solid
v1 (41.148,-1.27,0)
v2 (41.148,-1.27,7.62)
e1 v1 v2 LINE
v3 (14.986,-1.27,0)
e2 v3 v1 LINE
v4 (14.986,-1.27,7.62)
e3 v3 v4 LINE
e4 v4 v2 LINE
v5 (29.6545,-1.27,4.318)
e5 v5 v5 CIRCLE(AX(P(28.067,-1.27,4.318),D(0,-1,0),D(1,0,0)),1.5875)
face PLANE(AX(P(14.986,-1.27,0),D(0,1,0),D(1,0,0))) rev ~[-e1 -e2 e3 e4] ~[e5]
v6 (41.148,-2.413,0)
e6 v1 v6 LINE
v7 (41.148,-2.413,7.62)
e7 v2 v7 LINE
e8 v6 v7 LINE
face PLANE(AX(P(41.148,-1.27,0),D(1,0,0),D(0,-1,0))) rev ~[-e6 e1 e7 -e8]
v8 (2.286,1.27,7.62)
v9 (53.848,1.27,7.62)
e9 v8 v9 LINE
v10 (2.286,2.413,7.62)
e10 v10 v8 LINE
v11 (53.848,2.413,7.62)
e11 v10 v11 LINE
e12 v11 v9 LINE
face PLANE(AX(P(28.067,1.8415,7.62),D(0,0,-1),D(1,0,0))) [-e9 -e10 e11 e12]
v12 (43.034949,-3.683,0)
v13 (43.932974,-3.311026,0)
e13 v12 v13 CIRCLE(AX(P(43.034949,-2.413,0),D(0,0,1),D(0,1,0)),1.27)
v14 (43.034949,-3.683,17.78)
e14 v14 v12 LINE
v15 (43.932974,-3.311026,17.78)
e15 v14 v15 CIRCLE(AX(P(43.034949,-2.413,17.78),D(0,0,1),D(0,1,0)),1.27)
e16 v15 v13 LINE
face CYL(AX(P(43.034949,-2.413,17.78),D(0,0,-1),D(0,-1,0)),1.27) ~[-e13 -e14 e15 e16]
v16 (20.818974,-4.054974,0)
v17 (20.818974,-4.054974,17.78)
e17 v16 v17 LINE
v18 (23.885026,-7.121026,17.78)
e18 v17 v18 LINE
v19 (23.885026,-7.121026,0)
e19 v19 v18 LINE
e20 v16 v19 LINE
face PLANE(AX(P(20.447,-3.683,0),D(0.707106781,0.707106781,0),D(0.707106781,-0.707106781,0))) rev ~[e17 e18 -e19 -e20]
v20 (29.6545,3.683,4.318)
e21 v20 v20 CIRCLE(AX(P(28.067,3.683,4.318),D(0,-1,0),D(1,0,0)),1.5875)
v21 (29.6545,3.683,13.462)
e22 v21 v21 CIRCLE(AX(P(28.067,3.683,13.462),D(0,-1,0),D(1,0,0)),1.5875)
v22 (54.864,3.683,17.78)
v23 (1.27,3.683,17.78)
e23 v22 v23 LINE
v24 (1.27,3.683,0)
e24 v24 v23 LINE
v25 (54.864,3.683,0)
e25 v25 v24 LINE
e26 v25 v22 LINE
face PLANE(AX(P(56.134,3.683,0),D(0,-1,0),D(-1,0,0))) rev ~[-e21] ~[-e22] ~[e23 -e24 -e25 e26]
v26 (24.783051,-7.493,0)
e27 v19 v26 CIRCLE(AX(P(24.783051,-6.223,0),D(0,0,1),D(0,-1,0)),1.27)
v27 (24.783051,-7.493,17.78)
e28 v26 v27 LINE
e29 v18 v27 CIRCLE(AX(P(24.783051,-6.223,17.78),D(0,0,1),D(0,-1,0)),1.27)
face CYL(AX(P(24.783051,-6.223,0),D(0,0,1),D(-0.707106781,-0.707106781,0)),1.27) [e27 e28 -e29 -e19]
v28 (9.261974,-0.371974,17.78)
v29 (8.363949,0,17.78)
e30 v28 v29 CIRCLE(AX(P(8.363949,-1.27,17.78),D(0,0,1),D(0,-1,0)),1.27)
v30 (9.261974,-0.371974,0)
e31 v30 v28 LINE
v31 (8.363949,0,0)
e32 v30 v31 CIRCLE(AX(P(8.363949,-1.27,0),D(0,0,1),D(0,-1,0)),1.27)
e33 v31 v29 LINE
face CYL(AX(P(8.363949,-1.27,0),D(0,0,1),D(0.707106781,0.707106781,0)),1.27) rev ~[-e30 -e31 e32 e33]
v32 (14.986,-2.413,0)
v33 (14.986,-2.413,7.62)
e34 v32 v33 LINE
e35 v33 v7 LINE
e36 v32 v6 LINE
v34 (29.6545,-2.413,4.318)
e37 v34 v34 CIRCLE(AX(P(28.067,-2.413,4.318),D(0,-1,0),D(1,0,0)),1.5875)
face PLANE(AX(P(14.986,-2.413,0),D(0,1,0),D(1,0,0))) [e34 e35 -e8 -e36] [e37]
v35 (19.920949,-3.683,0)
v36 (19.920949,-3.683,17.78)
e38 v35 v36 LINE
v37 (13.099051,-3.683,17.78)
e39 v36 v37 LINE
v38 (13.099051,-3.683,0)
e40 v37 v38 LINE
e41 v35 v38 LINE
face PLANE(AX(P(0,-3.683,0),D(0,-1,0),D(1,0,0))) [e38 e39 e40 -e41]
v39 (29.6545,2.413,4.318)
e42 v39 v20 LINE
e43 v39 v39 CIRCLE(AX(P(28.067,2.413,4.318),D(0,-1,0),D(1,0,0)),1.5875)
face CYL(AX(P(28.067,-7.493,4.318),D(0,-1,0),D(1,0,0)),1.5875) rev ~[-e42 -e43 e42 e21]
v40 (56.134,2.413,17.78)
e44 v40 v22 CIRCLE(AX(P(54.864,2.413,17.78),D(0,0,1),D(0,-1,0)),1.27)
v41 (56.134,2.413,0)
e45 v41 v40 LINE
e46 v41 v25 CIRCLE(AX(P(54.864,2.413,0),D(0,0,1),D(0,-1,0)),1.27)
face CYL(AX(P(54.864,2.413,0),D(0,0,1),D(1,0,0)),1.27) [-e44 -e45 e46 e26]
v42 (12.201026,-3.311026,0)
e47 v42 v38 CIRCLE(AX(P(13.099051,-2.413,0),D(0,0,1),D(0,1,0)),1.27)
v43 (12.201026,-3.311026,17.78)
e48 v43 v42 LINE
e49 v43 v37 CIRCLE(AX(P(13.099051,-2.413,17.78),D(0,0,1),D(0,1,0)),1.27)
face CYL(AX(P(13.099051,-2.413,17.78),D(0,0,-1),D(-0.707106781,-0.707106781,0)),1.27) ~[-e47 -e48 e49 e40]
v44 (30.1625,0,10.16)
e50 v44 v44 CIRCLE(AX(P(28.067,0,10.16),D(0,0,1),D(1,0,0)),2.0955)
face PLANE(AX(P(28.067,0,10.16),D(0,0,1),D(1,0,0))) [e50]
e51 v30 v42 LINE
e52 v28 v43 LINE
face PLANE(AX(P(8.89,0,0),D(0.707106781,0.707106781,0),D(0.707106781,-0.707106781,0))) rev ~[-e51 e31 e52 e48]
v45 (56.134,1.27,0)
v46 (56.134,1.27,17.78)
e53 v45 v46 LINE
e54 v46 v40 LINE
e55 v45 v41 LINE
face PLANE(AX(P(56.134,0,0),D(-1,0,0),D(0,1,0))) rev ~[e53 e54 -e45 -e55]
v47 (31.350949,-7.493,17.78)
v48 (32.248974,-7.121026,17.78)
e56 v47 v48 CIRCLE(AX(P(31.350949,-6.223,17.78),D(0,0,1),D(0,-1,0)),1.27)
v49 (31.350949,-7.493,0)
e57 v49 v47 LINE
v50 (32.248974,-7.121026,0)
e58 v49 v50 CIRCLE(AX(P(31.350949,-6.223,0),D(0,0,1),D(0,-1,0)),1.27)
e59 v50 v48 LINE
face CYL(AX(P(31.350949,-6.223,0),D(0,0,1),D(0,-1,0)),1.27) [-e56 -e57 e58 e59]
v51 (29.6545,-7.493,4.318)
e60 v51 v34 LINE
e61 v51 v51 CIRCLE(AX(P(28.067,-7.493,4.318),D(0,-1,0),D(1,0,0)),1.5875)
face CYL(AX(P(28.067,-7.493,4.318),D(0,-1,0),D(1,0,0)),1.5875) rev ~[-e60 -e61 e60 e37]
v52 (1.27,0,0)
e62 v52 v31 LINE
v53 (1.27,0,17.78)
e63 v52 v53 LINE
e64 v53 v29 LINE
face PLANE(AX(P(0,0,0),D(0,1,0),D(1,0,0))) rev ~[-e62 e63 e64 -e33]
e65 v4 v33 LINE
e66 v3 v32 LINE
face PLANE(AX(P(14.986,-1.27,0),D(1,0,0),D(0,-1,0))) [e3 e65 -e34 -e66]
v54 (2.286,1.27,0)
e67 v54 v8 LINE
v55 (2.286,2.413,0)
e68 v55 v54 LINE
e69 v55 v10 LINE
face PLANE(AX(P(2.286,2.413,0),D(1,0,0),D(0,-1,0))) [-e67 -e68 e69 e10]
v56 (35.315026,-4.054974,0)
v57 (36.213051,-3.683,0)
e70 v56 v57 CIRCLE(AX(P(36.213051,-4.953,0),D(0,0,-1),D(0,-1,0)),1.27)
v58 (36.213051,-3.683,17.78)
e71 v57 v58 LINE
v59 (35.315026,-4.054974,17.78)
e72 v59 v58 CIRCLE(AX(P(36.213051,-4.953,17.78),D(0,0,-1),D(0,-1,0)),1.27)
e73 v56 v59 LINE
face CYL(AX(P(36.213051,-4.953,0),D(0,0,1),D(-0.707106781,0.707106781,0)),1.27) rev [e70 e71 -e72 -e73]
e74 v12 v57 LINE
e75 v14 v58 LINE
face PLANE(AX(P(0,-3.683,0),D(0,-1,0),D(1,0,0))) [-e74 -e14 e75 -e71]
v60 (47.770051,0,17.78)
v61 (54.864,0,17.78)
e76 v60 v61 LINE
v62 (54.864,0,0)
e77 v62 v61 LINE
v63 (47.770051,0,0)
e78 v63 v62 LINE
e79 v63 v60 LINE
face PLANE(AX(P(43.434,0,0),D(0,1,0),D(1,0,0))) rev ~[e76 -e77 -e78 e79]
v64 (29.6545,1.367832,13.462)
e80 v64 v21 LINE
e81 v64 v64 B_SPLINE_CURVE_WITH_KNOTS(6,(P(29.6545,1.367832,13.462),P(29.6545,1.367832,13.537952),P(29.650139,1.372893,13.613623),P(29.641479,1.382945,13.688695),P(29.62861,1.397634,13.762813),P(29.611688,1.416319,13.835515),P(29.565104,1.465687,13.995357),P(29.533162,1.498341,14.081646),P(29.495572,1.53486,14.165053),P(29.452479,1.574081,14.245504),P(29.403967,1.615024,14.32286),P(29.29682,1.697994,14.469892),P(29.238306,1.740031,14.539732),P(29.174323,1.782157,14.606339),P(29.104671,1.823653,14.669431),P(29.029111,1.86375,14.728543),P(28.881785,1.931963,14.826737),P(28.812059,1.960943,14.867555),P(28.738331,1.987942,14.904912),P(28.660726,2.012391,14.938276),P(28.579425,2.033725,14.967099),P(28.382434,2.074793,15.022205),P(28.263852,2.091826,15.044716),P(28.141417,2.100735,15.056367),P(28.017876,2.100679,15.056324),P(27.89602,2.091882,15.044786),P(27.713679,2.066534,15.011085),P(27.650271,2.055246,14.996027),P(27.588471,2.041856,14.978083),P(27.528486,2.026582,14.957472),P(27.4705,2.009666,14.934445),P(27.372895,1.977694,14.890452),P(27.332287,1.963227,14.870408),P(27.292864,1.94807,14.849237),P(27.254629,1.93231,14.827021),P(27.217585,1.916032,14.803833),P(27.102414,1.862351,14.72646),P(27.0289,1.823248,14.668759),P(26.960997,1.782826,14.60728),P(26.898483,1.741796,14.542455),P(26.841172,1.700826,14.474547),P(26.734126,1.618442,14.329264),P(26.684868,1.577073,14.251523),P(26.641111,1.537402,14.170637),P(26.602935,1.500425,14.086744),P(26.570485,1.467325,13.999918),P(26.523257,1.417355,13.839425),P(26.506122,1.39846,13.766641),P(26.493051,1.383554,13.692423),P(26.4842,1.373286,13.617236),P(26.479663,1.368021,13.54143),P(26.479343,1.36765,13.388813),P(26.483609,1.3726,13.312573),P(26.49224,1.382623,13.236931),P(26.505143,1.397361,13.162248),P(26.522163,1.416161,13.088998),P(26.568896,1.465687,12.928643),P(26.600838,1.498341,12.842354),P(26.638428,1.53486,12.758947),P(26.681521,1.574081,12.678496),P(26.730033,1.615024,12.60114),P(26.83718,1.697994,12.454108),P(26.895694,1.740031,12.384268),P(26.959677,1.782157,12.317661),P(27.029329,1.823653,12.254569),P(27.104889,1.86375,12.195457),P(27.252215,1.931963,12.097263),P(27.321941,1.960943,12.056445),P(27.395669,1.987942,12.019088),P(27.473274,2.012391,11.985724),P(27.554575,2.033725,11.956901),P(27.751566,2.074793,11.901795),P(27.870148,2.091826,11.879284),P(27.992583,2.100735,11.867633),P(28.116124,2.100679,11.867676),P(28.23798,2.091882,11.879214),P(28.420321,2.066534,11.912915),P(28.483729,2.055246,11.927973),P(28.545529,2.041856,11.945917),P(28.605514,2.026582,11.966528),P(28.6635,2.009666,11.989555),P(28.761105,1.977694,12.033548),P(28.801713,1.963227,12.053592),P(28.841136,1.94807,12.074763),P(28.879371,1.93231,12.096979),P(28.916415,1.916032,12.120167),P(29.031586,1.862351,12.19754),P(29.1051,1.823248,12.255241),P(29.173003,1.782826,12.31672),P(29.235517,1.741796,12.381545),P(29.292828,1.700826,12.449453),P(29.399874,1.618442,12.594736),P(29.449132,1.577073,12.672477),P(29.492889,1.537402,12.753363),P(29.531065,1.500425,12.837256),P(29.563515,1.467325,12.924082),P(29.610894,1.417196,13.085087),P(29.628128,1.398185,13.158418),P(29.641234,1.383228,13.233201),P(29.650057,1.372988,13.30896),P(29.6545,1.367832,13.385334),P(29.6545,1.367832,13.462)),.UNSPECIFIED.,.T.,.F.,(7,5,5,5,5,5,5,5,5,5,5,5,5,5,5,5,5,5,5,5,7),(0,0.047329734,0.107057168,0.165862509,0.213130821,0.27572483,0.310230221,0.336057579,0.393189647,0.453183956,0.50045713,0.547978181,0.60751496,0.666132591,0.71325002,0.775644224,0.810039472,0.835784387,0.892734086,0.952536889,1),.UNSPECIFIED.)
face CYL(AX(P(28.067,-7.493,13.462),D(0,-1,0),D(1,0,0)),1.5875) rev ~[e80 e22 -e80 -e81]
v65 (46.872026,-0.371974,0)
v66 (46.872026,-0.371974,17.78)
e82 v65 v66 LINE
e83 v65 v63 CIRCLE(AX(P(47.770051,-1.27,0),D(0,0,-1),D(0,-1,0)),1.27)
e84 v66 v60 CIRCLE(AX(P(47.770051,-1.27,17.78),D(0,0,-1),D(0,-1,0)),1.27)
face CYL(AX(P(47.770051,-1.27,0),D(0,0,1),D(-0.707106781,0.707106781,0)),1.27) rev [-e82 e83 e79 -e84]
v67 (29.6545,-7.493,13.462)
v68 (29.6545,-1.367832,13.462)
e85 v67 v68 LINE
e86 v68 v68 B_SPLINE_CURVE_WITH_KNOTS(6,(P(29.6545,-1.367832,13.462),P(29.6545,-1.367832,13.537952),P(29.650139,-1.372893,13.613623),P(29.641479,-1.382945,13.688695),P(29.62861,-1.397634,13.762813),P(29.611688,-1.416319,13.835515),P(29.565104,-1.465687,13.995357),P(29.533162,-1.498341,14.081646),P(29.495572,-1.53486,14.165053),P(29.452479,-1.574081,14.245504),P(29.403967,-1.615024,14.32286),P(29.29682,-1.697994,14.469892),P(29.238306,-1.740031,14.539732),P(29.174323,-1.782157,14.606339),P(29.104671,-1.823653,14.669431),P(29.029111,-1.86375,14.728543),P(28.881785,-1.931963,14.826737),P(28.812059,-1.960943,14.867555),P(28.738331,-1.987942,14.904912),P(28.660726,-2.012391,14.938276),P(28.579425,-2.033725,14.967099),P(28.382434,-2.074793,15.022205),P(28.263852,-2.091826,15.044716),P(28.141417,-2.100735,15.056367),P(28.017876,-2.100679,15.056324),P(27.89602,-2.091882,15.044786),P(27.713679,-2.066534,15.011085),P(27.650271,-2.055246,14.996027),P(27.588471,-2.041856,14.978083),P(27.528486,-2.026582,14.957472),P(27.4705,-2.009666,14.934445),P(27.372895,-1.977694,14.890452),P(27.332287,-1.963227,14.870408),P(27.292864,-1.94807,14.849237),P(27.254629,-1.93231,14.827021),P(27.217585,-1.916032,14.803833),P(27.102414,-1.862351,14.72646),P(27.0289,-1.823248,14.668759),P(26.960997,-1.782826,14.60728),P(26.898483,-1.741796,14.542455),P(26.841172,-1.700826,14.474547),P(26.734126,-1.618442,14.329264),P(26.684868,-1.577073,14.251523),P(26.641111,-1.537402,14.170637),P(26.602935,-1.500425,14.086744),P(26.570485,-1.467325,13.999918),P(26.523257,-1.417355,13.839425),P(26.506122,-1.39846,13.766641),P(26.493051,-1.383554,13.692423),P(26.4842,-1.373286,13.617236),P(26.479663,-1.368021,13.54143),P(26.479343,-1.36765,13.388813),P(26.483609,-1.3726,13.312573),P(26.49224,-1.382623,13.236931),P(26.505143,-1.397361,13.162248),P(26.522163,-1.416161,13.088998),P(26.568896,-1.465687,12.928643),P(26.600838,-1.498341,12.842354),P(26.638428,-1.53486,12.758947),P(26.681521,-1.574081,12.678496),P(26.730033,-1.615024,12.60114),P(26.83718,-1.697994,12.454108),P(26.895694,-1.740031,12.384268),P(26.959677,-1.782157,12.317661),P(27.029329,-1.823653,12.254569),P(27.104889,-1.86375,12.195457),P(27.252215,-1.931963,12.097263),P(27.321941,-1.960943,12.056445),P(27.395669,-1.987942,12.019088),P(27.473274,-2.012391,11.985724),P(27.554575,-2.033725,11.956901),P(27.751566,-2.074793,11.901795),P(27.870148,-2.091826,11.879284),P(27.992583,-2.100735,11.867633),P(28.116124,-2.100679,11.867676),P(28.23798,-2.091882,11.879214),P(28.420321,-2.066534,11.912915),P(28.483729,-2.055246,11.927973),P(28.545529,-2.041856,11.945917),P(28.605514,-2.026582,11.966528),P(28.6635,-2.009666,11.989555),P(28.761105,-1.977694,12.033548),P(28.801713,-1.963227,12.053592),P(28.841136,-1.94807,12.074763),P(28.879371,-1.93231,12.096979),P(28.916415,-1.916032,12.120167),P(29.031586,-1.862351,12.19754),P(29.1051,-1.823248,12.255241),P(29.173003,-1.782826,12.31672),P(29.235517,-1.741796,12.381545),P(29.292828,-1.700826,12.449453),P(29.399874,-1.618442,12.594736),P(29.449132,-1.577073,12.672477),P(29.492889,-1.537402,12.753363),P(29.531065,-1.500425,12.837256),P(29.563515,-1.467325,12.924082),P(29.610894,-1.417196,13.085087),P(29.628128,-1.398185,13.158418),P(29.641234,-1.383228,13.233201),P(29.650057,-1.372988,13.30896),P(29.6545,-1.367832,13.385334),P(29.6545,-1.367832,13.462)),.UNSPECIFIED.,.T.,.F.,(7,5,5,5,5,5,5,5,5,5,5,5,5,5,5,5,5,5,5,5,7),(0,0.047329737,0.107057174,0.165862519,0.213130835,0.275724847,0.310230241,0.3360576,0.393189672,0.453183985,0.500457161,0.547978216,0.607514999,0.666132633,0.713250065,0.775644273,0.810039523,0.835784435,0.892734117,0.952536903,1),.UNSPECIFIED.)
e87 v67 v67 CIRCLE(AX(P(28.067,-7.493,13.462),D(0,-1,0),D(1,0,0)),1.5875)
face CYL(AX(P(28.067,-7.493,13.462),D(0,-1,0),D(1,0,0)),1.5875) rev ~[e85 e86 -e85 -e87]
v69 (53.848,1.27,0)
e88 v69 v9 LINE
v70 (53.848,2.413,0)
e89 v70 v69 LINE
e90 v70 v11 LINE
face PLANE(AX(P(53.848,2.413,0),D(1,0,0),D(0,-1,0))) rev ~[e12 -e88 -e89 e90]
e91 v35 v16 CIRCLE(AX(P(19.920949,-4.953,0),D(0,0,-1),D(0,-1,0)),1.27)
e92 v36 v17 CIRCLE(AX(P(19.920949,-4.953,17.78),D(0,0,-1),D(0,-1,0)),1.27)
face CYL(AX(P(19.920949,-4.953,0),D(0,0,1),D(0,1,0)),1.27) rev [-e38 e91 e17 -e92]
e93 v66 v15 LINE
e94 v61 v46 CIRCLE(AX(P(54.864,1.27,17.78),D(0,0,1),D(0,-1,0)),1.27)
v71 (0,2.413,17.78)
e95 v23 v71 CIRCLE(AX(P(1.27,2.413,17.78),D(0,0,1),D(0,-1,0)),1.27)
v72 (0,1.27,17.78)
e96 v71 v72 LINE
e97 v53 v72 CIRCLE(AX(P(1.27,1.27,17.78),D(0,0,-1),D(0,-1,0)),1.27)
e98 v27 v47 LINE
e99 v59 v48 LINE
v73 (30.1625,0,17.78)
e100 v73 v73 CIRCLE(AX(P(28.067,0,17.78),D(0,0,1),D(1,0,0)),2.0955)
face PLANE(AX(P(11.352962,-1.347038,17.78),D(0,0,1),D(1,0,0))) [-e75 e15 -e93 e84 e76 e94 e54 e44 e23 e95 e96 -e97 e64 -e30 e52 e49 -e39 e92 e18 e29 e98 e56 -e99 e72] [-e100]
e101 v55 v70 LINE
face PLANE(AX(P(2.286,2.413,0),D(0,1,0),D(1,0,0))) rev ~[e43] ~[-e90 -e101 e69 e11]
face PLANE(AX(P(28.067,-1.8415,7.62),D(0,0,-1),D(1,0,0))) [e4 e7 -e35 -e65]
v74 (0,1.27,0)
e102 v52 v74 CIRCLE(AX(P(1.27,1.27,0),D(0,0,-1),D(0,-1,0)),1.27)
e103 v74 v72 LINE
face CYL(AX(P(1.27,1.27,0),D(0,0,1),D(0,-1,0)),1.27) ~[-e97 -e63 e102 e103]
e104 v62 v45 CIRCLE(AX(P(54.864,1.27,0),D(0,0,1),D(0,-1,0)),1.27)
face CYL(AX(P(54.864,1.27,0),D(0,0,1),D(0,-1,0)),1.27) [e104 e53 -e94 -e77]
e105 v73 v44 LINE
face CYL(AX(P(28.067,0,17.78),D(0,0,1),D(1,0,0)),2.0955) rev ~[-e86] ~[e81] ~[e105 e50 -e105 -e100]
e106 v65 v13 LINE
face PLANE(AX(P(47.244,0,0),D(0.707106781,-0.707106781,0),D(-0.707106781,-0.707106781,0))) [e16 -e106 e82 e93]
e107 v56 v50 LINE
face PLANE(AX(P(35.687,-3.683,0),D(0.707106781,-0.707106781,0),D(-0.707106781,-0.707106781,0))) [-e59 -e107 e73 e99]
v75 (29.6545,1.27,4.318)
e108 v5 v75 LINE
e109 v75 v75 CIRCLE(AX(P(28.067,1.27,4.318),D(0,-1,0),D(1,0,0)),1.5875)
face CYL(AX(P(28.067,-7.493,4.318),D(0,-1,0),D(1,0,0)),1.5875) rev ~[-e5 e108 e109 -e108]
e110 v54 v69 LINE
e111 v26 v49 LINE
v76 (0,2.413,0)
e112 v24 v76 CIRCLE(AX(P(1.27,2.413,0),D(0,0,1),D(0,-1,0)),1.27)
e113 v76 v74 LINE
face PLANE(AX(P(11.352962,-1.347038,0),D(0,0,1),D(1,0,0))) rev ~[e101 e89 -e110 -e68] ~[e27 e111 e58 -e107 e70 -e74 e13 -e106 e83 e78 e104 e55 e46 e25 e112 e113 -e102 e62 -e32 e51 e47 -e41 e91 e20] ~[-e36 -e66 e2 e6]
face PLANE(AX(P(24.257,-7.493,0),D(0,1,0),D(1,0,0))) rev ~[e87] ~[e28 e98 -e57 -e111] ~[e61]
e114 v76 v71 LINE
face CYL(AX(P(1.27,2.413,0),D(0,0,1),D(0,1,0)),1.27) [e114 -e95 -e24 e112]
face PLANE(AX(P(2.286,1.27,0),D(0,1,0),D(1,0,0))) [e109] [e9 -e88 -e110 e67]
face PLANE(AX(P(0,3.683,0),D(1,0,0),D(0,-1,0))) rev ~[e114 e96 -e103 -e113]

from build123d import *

# Parameters (mm, degrees)
F0_W         = 7.62
F0_H         = 3.81
F1_DEPTH     = 17.78
F2_W         = 51.562
F2_H         = 1.143
F2_W_2       = 26.162
F3_DEPTH     = 7.62
F4_T4_DEPTH  = 17.78
F4_T9_DEPTH  = 17.78
F4_T14_DEPTH = 17.78
F4_T19_DEPTH = 17.78
F5_R         = 1.5875
F6_DEPTH     = 25.4
F7_R         = 2.0955
F8_DEPTH     = 7.62
F9_R         = 1.27


# Not quite as in the source:
# - a fillet or chamfer that OpenCascade refuses, or shapes differently, is made with other operations: its cross-section is extruded or revolved along the edge and cut away or added


with BuildPart() as f1:
    # F0 (on Top) → F1 (new body)
    with BuildSketch(Plane.XY):
        Polygon((0, 3.683), (0, 0), (12.7, 0), (43.434, 0), (56.134, 0), (56.134, 3.683), align=None)
        Polygon((43.434, 0), (12.7, 0), (12.7, -3.683), (24.257, -3.683), (31.877, -3.683), (43.434, -3.683), align=None)
        with Locations((28.067, -5.588)):
            Rectangle(F0_W, F0_H)
    extrude(amount=F1_DEPTH)

    # F2 (on face) → F3 (cut)
    with BuildSketch(Plane(origin=(0, 0, 0), x_dir=(1, 0, 0), z_dir=(0, 0, -1))):
        with Locations((28.067, -1.8415)):
            Rectangle(F2_W, F2_H)
        with Locations((28.067, 1.8415)):
            Rectangle(F2_W_2, F2_H)
    extrude(amount=-F3_DEPTH, mode=Mode.SUBTRACT)

    # F4: chamfer of 3.81 on 4 edges, made by hand


with BuildPart() as f4_tool2:
    # F4_s3 → F4_t4 (new body)
    with BuildSketch(Plane.XY):
        Polygon((35.687, -3.683), (31.877, -7.493), (31.877, -3.683), align=None)
    extrude(amount=F4_T4_DEPTH)

    split(bisect_by=Plane.XZ.offset(7.493), keep=Keep.BOTTOM)


with BuildPart() as f1_1:
    add(f1.part)

    # F4_t1: union F4_tool2
    add(f4_tool2.part)


with BuildPart() as f4_tool7:
    # F4_s8 → F4_t9 (new body)
    with BuildSketch(Plane.XY):
        Polygon((47.244, 0), (43.434, -3.81), (43.434, 0), align=None)
    extrude(amount=F4_T9_DEPTH)

    split(bisect_by=Plane.XZ.offset(3.683), keep=Keep.BOTTOM)


with BuildPart() as f1_2:
    add(f1_1.part)

    # F4_t6: union F4_tool7
    add(f4_tool7.part)


with BuildPart() as f4_tool12:
    # F4_s13 → F4_t14 (new body)
    with BuildSketch(Plane.XY):
        Polygon((20.447, -3.683), (24.257, -7.493), (24.257, -3.683), align=None)
    extrude(amount=F4_T14_DEPTH)

    split(bisect_by=Plane.XZ.offset(7.493), keep=Keep.BOTTOM)


with BuildPart() as f1_3:
    add(f1_2.part)

    # F4_t11: union F4_tool12
    add(f4_tool12.part)


with BuildPart() as f4_tool17:
    # F4_s18 → F4_t19 (new body)
    with BuildSketch(Plane.XY):
        Polygon((8.89, 0), (12.7, -3.81), (12.7, 0), align=None)
    extrude(amount=F4_T19_DEPTH)

    split(bisect_by=Plane.XZ.offset(3.683), keep=Keep.BOTTOM)


with BuildPart() as f1_4:
    add(f1_3.part)

    # F4_t16: union F4_tool17
    add(f4_tool17.part)

    # F5 (on face) → F6 (cut)
    with BuildSketch(Plane.XZ.offset(7.493)):
        with Locations((28.067, 13.462)):
            Circle(F5_R)
        with Locations((28.067, 4.318)):
            Circle(F5_R)
    extrude(amount=-F6_DEPTH, mode=Mode.SUBTRACT)

    # F7 (on face) → F8 (cut)
    with BuildSketch(Plane.XY.offset(17.78)):
        with Locations((28.067, 0)):
            Circle(F7_R)
    extrude(amount=-F8_DEPTH, mode=Mode.SUBTRACT)

    # F9
    f9_edges = [f1_4.edges().sort_by_distance(p)[0] for p in [
        (0, 0, 8.89),
        (56.134, 0, 8.89),
        (56.134, 3.683, 8.89),
        (0, 3.683, 8.89),
        (12.573, -3.683, 8.89),
        (43.561, -3.683, 8.89),
        (31.877, -7.493, 8.89),
        (24.257, -7.493, 8.89),
        (8.89, 0, 8.89),
        (47.244, 0, 8.89),
        (35.687, -3.683, 8.89),
        (20.447, -3.683, 8.89),
    ]]
    fillet(f9_edges, radius=F9_R)


solid = f1_4.part
